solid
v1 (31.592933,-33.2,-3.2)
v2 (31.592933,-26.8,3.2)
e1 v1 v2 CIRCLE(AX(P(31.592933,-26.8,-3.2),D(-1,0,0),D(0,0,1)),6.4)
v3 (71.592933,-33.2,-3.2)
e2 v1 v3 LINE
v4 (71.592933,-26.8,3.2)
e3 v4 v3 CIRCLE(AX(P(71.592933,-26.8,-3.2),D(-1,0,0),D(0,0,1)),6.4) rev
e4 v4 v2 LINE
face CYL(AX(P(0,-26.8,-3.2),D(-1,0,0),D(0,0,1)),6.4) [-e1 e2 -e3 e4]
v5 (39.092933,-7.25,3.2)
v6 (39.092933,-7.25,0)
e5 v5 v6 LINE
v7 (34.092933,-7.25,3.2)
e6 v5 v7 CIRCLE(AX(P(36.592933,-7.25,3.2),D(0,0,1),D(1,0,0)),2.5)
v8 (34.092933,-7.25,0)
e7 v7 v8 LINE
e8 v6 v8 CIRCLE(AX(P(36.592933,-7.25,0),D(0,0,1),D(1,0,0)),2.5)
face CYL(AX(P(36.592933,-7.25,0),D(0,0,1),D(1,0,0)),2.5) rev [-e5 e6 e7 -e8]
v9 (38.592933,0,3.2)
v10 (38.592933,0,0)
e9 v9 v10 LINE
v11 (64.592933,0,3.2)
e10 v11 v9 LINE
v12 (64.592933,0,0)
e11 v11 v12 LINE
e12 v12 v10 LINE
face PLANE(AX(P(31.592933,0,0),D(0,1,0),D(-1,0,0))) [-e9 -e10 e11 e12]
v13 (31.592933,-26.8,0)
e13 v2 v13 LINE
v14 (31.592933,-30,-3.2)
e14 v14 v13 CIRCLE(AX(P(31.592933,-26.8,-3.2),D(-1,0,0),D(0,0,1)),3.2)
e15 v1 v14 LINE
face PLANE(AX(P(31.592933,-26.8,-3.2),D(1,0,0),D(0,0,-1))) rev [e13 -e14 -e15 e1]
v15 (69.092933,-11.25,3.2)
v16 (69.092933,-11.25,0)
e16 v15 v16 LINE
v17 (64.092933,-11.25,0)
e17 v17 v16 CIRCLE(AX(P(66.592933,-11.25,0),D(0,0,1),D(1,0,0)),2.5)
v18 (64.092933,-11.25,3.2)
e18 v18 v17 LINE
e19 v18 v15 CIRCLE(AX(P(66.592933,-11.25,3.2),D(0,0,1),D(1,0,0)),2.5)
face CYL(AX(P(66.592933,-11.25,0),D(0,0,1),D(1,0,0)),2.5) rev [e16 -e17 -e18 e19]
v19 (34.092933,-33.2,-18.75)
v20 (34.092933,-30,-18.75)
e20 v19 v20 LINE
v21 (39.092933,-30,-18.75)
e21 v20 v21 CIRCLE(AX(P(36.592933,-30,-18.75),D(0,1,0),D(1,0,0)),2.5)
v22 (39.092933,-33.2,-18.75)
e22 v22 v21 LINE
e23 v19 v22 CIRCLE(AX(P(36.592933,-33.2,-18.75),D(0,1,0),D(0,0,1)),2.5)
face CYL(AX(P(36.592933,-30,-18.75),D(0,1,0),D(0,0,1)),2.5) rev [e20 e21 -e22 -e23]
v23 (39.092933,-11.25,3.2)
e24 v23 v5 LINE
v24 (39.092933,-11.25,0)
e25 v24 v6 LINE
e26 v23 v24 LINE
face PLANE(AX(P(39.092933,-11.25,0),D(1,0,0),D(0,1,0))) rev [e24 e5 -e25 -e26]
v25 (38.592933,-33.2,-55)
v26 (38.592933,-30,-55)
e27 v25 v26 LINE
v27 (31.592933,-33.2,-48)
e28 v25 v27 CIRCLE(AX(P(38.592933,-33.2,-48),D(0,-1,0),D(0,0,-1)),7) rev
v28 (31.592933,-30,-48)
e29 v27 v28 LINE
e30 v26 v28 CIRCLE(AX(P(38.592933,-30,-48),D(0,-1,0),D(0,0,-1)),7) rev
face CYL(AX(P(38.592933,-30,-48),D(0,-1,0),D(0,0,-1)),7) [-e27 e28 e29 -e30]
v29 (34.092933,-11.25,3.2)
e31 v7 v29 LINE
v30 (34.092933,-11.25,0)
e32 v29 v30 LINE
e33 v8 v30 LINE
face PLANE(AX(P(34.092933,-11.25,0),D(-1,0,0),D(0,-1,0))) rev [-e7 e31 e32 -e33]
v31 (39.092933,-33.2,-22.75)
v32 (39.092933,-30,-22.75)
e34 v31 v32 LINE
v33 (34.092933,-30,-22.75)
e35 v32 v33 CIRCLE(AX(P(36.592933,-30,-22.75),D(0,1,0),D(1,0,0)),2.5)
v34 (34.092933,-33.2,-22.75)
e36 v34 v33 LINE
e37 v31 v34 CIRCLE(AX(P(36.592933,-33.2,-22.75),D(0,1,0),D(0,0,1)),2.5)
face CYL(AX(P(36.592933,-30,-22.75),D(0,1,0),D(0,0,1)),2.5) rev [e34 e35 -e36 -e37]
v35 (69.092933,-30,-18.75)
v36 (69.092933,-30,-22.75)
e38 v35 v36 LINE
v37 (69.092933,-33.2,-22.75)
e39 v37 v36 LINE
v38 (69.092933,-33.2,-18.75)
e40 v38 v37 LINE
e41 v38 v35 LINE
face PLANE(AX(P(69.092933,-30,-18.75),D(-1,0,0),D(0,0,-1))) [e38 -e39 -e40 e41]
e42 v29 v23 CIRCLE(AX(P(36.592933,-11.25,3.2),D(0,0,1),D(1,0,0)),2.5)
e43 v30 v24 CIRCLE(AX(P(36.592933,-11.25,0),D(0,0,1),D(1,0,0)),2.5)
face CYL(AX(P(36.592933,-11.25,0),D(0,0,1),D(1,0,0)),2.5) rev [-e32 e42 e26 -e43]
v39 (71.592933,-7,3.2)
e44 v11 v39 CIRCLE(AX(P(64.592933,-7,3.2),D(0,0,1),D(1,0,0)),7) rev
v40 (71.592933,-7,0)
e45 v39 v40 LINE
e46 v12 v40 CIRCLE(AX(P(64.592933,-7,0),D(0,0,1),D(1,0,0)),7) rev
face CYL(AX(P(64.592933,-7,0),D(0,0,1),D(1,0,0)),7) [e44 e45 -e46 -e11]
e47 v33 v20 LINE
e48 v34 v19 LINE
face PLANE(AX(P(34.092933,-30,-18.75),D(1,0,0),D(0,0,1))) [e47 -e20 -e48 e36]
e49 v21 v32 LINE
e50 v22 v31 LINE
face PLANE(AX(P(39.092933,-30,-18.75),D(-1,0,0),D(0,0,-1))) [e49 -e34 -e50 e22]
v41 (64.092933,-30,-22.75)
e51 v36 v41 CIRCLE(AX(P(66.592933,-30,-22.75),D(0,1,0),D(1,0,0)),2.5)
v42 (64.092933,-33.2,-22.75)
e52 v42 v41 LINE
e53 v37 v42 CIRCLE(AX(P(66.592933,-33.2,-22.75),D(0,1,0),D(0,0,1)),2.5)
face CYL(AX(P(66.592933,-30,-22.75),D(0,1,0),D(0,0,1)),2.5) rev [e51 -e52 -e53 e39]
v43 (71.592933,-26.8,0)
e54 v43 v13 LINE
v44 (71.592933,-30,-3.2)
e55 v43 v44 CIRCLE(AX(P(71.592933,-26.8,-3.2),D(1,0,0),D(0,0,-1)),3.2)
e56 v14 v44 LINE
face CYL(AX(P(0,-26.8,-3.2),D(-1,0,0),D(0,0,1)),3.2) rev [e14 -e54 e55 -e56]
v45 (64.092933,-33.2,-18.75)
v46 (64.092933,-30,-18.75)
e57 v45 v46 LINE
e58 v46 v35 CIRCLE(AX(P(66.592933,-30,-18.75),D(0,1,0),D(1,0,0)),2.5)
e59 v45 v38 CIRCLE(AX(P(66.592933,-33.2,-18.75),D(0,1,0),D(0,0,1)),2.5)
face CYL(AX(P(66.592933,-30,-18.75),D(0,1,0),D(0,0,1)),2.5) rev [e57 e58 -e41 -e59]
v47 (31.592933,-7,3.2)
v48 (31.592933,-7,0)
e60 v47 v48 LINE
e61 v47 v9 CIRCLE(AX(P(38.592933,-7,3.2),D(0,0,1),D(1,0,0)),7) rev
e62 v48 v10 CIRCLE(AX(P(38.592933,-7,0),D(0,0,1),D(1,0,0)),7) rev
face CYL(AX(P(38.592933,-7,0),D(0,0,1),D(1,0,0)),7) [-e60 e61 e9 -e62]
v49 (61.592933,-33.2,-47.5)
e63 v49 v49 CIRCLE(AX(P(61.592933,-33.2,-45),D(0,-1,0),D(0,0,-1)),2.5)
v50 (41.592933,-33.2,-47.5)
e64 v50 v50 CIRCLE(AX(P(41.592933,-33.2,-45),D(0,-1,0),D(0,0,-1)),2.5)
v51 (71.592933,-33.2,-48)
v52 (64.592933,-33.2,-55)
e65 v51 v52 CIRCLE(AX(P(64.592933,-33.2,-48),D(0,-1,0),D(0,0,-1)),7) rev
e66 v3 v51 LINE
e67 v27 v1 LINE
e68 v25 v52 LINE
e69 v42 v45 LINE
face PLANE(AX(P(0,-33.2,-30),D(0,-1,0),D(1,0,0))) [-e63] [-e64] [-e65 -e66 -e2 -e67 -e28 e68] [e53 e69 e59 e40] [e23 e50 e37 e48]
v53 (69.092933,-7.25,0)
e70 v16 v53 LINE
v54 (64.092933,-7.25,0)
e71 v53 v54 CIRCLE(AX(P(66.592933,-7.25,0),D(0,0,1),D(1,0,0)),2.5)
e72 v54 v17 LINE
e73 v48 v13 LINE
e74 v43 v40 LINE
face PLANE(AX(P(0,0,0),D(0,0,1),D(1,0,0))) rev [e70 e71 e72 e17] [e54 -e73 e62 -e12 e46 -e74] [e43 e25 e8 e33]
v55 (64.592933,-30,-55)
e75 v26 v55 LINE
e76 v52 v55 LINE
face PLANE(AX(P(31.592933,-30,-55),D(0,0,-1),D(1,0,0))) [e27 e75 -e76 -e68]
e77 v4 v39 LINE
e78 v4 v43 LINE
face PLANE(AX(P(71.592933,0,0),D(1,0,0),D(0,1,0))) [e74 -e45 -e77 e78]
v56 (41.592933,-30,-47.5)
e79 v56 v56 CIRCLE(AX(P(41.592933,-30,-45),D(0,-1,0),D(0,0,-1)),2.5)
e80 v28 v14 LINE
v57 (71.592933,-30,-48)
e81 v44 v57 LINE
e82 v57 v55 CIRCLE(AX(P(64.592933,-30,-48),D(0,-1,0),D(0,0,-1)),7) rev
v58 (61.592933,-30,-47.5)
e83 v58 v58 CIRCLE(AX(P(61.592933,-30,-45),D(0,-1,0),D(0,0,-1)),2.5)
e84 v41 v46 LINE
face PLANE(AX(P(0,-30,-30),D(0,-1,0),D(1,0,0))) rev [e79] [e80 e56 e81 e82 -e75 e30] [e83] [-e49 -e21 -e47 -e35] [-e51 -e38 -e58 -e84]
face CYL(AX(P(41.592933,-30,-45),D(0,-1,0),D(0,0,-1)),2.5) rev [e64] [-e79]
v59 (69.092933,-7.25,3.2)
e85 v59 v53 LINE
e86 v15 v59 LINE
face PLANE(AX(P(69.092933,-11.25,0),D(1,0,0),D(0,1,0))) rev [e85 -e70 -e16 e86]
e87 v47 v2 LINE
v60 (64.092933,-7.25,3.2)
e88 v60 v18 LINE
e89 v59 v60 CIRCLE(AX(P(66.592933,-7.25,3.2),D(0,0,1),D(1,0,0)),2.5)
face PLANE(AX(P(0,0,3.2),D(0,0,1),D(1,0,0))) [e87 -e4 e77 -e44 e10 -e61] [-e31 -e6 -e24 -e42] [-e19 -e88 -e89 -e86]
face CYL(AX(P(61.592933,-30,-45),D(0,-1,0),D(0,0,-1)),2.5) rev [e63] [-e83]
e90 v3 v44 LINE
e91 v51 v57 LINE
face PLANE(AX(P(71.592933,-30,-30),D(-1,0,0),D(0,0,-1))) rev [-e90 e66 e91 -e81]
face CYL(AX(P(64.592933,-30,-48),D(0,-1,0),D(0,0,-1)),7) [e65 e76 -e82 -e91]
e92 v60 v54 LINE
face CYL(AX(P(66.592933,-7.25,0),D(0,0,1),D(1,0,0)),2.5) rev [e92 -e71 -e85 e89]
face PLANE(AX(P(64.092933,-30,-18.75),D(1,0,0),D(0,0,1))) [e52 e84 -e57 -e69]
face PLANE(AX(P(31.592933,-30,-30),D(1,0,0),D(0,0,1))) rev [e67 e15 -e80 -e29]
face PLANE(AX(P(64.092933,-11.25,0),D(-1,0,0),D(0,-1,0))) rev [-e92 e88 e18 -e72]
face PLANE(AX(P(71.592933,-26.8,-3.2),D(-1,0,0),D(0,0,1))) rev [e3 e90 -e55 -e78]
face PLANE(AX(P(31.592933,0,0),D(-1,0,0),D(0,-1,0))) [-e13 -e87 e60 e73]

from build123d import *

# Parameters (mm, degrees)
SKETCH1_W                  = 39.999999999
SKETCH1_H                  = 30
BOSS_EXTRUDE1_DEPTH        = 3.175
SKETCH3_W                  = 3.175
SKETCH3_H                  = 3.175
SKETCH3_W_2                = 25
BOSS_EXTRUDE2_DEPTH        = 40
SKETCH4_R                  = 2.5
CUT_EXTRUDE1_DEPTH         = 10
FILLET1_R                  = 7
CONVERT_SOLID1_START       = -32.140684808
CONVERT_SOLID1_OUTLINE_R   = 2.5
CONVERT_SOLID1_DEPTH       = 5.340684808
CONVERT_SOLID1_START_2     = -33.2
CONVERT_SOLID1_2_OUTLINE_R = 2.5
CONVERT_SOLID1_2_DEPTH     = 0.025
CONVERT_SOLID1_START_3     = -27.475968
CONVERT_SOLID1_3_OUTLINE_W = 39.999999999
CONVERT_SOLID1_3_OUTLINE_H = 0.025
CONVERT_SOLID1_3_DEPTH     = 27.475968
CONVERT_SOLID1_START_4     = 31.592932584
CONVERT_SOLID1_4_DEPTH     = 39.999999999
CONVERT_SOLID1_START_5     = -49
CONVERT_SOLID1_5_OUTLINE_W = 39.999999999
CONVERT_SOLID1_5_OUTLINE_H = 3.2
CONVERT_SOLID1_5_DEPTH     = 2.85856
CONVERT_SOLID1_START_6     = 3.175
CONVERT_SOLID1_6_DEPTH     = 0.825


with BuildPart() as part:
    # Sketch1 → Boss-Extrude1 (new body)
    with BuildSketch(Plane.XY):
        with Locations((51.592932584, -15)):
            Rectangle(SKETCH1_W, SKETCH1_H)
        with BuildLine():
            Line((34.092932584, -11.25), (34.092932584, -7.25))
            ThreePointArc((34.092932584, -7.25), (36.592932584, -4.75), (39.092932584, -7.25))
            Line((39.092932584, -7.25), (39.092932584, -11.25))
            ThreePointArc((39.092932584, -11.25), (36.592932584, -13.75), (34.092932584, -11.25))
        make_face(mode=Mode.SUBTRACT)
        with BuildLine():
            Line((64.092932583, -11.25), (64.092932583, -7.25))
            ThreePointArc((64.092932583, -7.25), (66.592932583, -4.75), (69.092932583, -7.25))
            Line((69.092932583, -7.25), (69.092932583, -11.25))
            ThreePointArc((69.092932583, -11.25), (66.592932583, -13.75), (64.092932583, -11.25))
        make_face(mode=Mode.SUBTRACT)
    extrude(amount=BOSS_EXTRUDE1_DEPTH)


with BuildPart() as body_2:
    # Mirror1: mirrored copy
    add(part.part.mirror(Plane(origin=(0, -15, -15), x_dir=(0, -0.7071067811865465, 0.7071067811865486), z_dir=(0, -0.7071067811865488, -0.7071067811865464))))


with BuildPart() as part_1:
    add(part.part)

    add(body_2.part)  # Boss-Extrude2 merges body 2
    # Sketch3 → Boss-Extrude2 (add, through all)
    with BuildSketch(Plane(origin=(71.592932583, 0, 0), x_dir=(0, 0, -1), z_dir=(1, 0, 0))):
        with Locations((-1.5875, -31.5875)):
            Rectangle(SKETCH3_W, SKETCH3_H)
        with Locations((42.5, -31.5875)):
            Rectangle(SKETCH3_W_2, SKETCH3_H)
    extrude(amount=-BOSS_EXTRUDE2_DEPTH)

    # Sketch4 → Cut-Extrude1 (cut)
    with BuildSketch(Plane.XZ.offset(33.175)):
        with Locations((61.592932583, -45)):
            Circle(SKETCH4_R)
        with Locations((41.592932584, -45)):
            Circle(SKETCH4_R)
    extrude(amount=-CUT_EXTRUDE1_DEPTH, mode=Mode.SUBTRACT)

    # Fillet1
    fillet1_edges = [part_1.edges().sort_by_distance(p)[0] for p in [
        (31.592932584, 0, 1.5875),
        (71.592932583, 0, 1.5875),
        (71.592932583, -31.5875, -55),
        (31.592932583, -31.5875, -55),
    ]]
    fillet(fillet1_edges, radius=FILLET1_R)

    # Convert-Solid1: read off the stored shape, not the designer's step
    # Convert-Solid1 outline → Convert-Solid1 (add)
    with BuildSketch(Plane(origin=(0, 0, 0), x_dir=(1, 0, 0), z_dir=(0, 1, 0)).offset(CONVERT_SOLID1_START)):
        with BuildLine():
            Line((31.592932584, 48), (31.592932584, 0))
            Line((31.592932584, 0), (71.592932583, 0))
            Line((71.592932583, 0), (71.592932583, 48))
            ThreePointArc((71.592932583, 48), (69.542680051, 52.949747468), (64.592932583, 55))
            Line((64.592932583, 55), (38.592932584, 55))
            ThreePointArc((38.592932584, 55), (33.643185116, 52.949747469), (31.592932584, 48))
        make_face()
        with BuildLine():
            ThreePointArc((34.092932584, 22.75), (36.592932584, 25.25), (39.092932584, 22.75))
            Line((39.092932584, 22.75), (39.092932584, 18.75))
            ThreePointArc((39.092932584, 18.75), (36.592932584, 16.25), (34.092932584, 18.75))
            Line((34.092932584, 18.75), (34.092932584, 22.75))
        make_face(mode=Mode.SUBTRACT)
        with BuildLine():
            ThreePointArc((64.092932583, 22.75), (66.592932583, 25.25), (69.092932583, 22.75))
            Line((69.092932583, 22.75), (69.092932583, 18.75))
            ThreePointArc((69.092932583, 18.75), (66.592932583, 16.25), (64.092932583, 18.75))
            Line((64.092932583, 18.75), (64.092932583, 22.75))
        make_face(mode=Mode.SUBTRACT)
        with Locations((41.592932584, 45)):
            Circle(CONVERT_SOLID1_OUTLINE_R, mode=Mode.SUBTRACT)
        with Locations((61.592932583, 45)):
            Circle(CONVERT_SOLID1_OUTLINE_R, mode=Mode.SUBTRACT)
    extrude(amount=CONVERT_SOLID1_DEPTH)

    # Convert-Solid1 2 outline → Convert-Solid1 2 (add)
    with BuildSketch(Plane(origin=(0, 0, 0), x_dir=(1, 0, 0), z_dir=(0, 1, 0)).offset(CONVERT_SOLID1_START_2)):
        with BuildLine():
            Line((31.592932584, 48), (31.592932584, 0))
            Line((31.592932584, 0), (71.592932583, 0))
            Line((71.592932583, 0), (71.592932583, 48))
            ThreePointArc((71.592932583, 48), (69.542680051, 52.949747468), (64.592932583, 55))
            Line((64.592932583, 55), (38.592932584, 55))
            ThreePointArc((38.592932584, 55), (33.643185116, 52.949747469), (31.592932584, 48))
        make_face()
        with BuildLine():
            ThreePointArc((34.092932584, 22.75), (36.592932584, 25.25), (39.092932584, 22.75))
            Line((39.092932584, 22.75), (39.092932584, 18.75))
            ThreePointArc((39.092932584, 18.75), (36.592932584, 16.25), (34.092932584, 18.75))
            Line((34.092932584, 18.75), (34.092932584, 22.75))
        make_face(mode=Mode.SUBTRACT)
        with BuildLine():
            ThreePointArc((64.092932583, 22.75), (66.592932583, 25.25), (69.092932583, 22.75))
            Line((69.092932583, 22.75), (69.092932583, 18.75))
            ThreePointArc((69.092932583, 18.75), (66.592932583, 16.25), (64.092932583, 18.75))
            Line((64.092932583, 18.75), (64.092932583, 22.75))
        make_face(mode=Mode.SUBTRACT)
        with Locations((41.592932584, 45)):
            Circle(CONVERT_SOLID1_2_OUTLINE_R, mode=Mode.SUBTRACT)
        with Locations((61.592932583, 45)):
            Circle(CONVERT_SOLID1_2_OUTLINE_R, mode=Mode.SUBTRACT)
    extrude(amount=CONVERT_SOLID1_2_DEPTH)

    # Convert-Solid1 3 outline → Convert-Solid1 3 (add)
    with BuildSketch(Plane(origin=(0, 0, 0), x_dir=(1, 0, 0), z_dir=(0, 1, 0)).offset(CONVERT_SOLID1_START_3)):
        with Locations((51.592932584, -3.1875)):
            Rectangle(CONVERT_SOLID1_3_OUTLINE_W, CONVERT_SOLID1_3_OUTLINE_H)
    extrude(amount=CONVERT_SOLID1_3_DEPTH)

    # Convert-Solid1 4 outline → Convert-Solid1 4 (cut)
    with BuildSketch(Plane.YZ.offset(CONVERT_SOLID1_START_4)):
        with BuildLine():
            ThreePointArc((-26.8, 0), (-29.0627417, -0.9372583), (-30, -3.2))
            Line((-30, -3.2), (-30, -55))
            Line((-30, -55), (-26.8, -55))
            Line((-26.8, -55), (-26.8, 0))
        make_face()
        with BuildLine():
            Line((-33.2, 0), (-33.2, -3.2))
            ThreePointArc((-33.2, -3.2), (-31.3254834, 1.3254834), (-26.8, 3.2))
            Line((-26.8, 3.2), (-27.475968, 3.2))
            Line((-27.475968, 3.2), (-27.475968, 3.175))
            Line((-27.475968, 3.175), (-33.175, 3.175))
            Line((-33.175, 3.175), (-33.175, 0))
            Line((-33.175, 0), (-33.2, 0))
        make_face()
    extrude(amount=CONVERT_SOLID1_4_DEPTH, mode=Mode.SUBTRACT)

    # Convert-Solid1 5 outline → Convert-Solid1 5 (cut)
    with BuildSketch(Plane.XY.offset(CONVERT_SOLID1_START_5)):
        with Locations((51.592932584, -28.4)):
            Rectangle(CONVERT_SOLID1_5_OUTLINE_W, CONVERT_SOLID1_5_OUTLINE_H)
    extrude(amount=CONVERT_SOLID1_5_DEPTH, mode=Mode.SUBTRACT)

    # Convert-Solid1 6 outline → Convert-Solid1 6 (cut)
    with BuildSketch(Plane.XY.offset(CONVERT_SOLID1_START_6)):
        with BuildLine():
            Line((71.592932583, -7), (71.592932583, 0))
            Line((71.592932583, 0), (64.592932583, 0))
            ThreePointArc((64.592932583, 0), (69.542680051, -2.050252532), (71.592932583, -7))
        make_face()
        with BuildLine():
            ThreePointArc((31.592932584, -7), (33.643185116, -2.050252531), (38.592932584, 0))
            Line((38.592932584, 0), (31.592932584, 0))
            Line((31.592932584, 0), (31.592932584, -7))
        make_face()
        with BuildLine():
            ThreePointArc((64.092932583, -11.25), (66.592932583, -13.75), (69.092932583, -11.25))
            Line((69.092932583, -11.25), (69.092932583, -7.25))
            ThreePointArc((69.092932583, -7.25), (66.592932583, -4.75), (64.092932583, -7.25))
            Line((64.092932583, -7.25), (64.092932583, -11.25))
        make_face()
        with BuildLine():
            ThreePointArc((34.092932584, -11.25), (36.592932584, -13.75), (39.092932584, -11.25))
            Line((39.092932584, -11.25), (39.092932584, -7.25))
            ThreePointArc((39.092932584, -7.25), (36.592932584, -4.75), (34.092932584, -7.25))
            Line((34.092932584, -7.25), (34.092932584, -11.25))
        make_face()
    extrude(amount=CONVERT_SOLID1_6_DEPTH, mode=Mode.SUBTRACT)


solid = part_1.part
